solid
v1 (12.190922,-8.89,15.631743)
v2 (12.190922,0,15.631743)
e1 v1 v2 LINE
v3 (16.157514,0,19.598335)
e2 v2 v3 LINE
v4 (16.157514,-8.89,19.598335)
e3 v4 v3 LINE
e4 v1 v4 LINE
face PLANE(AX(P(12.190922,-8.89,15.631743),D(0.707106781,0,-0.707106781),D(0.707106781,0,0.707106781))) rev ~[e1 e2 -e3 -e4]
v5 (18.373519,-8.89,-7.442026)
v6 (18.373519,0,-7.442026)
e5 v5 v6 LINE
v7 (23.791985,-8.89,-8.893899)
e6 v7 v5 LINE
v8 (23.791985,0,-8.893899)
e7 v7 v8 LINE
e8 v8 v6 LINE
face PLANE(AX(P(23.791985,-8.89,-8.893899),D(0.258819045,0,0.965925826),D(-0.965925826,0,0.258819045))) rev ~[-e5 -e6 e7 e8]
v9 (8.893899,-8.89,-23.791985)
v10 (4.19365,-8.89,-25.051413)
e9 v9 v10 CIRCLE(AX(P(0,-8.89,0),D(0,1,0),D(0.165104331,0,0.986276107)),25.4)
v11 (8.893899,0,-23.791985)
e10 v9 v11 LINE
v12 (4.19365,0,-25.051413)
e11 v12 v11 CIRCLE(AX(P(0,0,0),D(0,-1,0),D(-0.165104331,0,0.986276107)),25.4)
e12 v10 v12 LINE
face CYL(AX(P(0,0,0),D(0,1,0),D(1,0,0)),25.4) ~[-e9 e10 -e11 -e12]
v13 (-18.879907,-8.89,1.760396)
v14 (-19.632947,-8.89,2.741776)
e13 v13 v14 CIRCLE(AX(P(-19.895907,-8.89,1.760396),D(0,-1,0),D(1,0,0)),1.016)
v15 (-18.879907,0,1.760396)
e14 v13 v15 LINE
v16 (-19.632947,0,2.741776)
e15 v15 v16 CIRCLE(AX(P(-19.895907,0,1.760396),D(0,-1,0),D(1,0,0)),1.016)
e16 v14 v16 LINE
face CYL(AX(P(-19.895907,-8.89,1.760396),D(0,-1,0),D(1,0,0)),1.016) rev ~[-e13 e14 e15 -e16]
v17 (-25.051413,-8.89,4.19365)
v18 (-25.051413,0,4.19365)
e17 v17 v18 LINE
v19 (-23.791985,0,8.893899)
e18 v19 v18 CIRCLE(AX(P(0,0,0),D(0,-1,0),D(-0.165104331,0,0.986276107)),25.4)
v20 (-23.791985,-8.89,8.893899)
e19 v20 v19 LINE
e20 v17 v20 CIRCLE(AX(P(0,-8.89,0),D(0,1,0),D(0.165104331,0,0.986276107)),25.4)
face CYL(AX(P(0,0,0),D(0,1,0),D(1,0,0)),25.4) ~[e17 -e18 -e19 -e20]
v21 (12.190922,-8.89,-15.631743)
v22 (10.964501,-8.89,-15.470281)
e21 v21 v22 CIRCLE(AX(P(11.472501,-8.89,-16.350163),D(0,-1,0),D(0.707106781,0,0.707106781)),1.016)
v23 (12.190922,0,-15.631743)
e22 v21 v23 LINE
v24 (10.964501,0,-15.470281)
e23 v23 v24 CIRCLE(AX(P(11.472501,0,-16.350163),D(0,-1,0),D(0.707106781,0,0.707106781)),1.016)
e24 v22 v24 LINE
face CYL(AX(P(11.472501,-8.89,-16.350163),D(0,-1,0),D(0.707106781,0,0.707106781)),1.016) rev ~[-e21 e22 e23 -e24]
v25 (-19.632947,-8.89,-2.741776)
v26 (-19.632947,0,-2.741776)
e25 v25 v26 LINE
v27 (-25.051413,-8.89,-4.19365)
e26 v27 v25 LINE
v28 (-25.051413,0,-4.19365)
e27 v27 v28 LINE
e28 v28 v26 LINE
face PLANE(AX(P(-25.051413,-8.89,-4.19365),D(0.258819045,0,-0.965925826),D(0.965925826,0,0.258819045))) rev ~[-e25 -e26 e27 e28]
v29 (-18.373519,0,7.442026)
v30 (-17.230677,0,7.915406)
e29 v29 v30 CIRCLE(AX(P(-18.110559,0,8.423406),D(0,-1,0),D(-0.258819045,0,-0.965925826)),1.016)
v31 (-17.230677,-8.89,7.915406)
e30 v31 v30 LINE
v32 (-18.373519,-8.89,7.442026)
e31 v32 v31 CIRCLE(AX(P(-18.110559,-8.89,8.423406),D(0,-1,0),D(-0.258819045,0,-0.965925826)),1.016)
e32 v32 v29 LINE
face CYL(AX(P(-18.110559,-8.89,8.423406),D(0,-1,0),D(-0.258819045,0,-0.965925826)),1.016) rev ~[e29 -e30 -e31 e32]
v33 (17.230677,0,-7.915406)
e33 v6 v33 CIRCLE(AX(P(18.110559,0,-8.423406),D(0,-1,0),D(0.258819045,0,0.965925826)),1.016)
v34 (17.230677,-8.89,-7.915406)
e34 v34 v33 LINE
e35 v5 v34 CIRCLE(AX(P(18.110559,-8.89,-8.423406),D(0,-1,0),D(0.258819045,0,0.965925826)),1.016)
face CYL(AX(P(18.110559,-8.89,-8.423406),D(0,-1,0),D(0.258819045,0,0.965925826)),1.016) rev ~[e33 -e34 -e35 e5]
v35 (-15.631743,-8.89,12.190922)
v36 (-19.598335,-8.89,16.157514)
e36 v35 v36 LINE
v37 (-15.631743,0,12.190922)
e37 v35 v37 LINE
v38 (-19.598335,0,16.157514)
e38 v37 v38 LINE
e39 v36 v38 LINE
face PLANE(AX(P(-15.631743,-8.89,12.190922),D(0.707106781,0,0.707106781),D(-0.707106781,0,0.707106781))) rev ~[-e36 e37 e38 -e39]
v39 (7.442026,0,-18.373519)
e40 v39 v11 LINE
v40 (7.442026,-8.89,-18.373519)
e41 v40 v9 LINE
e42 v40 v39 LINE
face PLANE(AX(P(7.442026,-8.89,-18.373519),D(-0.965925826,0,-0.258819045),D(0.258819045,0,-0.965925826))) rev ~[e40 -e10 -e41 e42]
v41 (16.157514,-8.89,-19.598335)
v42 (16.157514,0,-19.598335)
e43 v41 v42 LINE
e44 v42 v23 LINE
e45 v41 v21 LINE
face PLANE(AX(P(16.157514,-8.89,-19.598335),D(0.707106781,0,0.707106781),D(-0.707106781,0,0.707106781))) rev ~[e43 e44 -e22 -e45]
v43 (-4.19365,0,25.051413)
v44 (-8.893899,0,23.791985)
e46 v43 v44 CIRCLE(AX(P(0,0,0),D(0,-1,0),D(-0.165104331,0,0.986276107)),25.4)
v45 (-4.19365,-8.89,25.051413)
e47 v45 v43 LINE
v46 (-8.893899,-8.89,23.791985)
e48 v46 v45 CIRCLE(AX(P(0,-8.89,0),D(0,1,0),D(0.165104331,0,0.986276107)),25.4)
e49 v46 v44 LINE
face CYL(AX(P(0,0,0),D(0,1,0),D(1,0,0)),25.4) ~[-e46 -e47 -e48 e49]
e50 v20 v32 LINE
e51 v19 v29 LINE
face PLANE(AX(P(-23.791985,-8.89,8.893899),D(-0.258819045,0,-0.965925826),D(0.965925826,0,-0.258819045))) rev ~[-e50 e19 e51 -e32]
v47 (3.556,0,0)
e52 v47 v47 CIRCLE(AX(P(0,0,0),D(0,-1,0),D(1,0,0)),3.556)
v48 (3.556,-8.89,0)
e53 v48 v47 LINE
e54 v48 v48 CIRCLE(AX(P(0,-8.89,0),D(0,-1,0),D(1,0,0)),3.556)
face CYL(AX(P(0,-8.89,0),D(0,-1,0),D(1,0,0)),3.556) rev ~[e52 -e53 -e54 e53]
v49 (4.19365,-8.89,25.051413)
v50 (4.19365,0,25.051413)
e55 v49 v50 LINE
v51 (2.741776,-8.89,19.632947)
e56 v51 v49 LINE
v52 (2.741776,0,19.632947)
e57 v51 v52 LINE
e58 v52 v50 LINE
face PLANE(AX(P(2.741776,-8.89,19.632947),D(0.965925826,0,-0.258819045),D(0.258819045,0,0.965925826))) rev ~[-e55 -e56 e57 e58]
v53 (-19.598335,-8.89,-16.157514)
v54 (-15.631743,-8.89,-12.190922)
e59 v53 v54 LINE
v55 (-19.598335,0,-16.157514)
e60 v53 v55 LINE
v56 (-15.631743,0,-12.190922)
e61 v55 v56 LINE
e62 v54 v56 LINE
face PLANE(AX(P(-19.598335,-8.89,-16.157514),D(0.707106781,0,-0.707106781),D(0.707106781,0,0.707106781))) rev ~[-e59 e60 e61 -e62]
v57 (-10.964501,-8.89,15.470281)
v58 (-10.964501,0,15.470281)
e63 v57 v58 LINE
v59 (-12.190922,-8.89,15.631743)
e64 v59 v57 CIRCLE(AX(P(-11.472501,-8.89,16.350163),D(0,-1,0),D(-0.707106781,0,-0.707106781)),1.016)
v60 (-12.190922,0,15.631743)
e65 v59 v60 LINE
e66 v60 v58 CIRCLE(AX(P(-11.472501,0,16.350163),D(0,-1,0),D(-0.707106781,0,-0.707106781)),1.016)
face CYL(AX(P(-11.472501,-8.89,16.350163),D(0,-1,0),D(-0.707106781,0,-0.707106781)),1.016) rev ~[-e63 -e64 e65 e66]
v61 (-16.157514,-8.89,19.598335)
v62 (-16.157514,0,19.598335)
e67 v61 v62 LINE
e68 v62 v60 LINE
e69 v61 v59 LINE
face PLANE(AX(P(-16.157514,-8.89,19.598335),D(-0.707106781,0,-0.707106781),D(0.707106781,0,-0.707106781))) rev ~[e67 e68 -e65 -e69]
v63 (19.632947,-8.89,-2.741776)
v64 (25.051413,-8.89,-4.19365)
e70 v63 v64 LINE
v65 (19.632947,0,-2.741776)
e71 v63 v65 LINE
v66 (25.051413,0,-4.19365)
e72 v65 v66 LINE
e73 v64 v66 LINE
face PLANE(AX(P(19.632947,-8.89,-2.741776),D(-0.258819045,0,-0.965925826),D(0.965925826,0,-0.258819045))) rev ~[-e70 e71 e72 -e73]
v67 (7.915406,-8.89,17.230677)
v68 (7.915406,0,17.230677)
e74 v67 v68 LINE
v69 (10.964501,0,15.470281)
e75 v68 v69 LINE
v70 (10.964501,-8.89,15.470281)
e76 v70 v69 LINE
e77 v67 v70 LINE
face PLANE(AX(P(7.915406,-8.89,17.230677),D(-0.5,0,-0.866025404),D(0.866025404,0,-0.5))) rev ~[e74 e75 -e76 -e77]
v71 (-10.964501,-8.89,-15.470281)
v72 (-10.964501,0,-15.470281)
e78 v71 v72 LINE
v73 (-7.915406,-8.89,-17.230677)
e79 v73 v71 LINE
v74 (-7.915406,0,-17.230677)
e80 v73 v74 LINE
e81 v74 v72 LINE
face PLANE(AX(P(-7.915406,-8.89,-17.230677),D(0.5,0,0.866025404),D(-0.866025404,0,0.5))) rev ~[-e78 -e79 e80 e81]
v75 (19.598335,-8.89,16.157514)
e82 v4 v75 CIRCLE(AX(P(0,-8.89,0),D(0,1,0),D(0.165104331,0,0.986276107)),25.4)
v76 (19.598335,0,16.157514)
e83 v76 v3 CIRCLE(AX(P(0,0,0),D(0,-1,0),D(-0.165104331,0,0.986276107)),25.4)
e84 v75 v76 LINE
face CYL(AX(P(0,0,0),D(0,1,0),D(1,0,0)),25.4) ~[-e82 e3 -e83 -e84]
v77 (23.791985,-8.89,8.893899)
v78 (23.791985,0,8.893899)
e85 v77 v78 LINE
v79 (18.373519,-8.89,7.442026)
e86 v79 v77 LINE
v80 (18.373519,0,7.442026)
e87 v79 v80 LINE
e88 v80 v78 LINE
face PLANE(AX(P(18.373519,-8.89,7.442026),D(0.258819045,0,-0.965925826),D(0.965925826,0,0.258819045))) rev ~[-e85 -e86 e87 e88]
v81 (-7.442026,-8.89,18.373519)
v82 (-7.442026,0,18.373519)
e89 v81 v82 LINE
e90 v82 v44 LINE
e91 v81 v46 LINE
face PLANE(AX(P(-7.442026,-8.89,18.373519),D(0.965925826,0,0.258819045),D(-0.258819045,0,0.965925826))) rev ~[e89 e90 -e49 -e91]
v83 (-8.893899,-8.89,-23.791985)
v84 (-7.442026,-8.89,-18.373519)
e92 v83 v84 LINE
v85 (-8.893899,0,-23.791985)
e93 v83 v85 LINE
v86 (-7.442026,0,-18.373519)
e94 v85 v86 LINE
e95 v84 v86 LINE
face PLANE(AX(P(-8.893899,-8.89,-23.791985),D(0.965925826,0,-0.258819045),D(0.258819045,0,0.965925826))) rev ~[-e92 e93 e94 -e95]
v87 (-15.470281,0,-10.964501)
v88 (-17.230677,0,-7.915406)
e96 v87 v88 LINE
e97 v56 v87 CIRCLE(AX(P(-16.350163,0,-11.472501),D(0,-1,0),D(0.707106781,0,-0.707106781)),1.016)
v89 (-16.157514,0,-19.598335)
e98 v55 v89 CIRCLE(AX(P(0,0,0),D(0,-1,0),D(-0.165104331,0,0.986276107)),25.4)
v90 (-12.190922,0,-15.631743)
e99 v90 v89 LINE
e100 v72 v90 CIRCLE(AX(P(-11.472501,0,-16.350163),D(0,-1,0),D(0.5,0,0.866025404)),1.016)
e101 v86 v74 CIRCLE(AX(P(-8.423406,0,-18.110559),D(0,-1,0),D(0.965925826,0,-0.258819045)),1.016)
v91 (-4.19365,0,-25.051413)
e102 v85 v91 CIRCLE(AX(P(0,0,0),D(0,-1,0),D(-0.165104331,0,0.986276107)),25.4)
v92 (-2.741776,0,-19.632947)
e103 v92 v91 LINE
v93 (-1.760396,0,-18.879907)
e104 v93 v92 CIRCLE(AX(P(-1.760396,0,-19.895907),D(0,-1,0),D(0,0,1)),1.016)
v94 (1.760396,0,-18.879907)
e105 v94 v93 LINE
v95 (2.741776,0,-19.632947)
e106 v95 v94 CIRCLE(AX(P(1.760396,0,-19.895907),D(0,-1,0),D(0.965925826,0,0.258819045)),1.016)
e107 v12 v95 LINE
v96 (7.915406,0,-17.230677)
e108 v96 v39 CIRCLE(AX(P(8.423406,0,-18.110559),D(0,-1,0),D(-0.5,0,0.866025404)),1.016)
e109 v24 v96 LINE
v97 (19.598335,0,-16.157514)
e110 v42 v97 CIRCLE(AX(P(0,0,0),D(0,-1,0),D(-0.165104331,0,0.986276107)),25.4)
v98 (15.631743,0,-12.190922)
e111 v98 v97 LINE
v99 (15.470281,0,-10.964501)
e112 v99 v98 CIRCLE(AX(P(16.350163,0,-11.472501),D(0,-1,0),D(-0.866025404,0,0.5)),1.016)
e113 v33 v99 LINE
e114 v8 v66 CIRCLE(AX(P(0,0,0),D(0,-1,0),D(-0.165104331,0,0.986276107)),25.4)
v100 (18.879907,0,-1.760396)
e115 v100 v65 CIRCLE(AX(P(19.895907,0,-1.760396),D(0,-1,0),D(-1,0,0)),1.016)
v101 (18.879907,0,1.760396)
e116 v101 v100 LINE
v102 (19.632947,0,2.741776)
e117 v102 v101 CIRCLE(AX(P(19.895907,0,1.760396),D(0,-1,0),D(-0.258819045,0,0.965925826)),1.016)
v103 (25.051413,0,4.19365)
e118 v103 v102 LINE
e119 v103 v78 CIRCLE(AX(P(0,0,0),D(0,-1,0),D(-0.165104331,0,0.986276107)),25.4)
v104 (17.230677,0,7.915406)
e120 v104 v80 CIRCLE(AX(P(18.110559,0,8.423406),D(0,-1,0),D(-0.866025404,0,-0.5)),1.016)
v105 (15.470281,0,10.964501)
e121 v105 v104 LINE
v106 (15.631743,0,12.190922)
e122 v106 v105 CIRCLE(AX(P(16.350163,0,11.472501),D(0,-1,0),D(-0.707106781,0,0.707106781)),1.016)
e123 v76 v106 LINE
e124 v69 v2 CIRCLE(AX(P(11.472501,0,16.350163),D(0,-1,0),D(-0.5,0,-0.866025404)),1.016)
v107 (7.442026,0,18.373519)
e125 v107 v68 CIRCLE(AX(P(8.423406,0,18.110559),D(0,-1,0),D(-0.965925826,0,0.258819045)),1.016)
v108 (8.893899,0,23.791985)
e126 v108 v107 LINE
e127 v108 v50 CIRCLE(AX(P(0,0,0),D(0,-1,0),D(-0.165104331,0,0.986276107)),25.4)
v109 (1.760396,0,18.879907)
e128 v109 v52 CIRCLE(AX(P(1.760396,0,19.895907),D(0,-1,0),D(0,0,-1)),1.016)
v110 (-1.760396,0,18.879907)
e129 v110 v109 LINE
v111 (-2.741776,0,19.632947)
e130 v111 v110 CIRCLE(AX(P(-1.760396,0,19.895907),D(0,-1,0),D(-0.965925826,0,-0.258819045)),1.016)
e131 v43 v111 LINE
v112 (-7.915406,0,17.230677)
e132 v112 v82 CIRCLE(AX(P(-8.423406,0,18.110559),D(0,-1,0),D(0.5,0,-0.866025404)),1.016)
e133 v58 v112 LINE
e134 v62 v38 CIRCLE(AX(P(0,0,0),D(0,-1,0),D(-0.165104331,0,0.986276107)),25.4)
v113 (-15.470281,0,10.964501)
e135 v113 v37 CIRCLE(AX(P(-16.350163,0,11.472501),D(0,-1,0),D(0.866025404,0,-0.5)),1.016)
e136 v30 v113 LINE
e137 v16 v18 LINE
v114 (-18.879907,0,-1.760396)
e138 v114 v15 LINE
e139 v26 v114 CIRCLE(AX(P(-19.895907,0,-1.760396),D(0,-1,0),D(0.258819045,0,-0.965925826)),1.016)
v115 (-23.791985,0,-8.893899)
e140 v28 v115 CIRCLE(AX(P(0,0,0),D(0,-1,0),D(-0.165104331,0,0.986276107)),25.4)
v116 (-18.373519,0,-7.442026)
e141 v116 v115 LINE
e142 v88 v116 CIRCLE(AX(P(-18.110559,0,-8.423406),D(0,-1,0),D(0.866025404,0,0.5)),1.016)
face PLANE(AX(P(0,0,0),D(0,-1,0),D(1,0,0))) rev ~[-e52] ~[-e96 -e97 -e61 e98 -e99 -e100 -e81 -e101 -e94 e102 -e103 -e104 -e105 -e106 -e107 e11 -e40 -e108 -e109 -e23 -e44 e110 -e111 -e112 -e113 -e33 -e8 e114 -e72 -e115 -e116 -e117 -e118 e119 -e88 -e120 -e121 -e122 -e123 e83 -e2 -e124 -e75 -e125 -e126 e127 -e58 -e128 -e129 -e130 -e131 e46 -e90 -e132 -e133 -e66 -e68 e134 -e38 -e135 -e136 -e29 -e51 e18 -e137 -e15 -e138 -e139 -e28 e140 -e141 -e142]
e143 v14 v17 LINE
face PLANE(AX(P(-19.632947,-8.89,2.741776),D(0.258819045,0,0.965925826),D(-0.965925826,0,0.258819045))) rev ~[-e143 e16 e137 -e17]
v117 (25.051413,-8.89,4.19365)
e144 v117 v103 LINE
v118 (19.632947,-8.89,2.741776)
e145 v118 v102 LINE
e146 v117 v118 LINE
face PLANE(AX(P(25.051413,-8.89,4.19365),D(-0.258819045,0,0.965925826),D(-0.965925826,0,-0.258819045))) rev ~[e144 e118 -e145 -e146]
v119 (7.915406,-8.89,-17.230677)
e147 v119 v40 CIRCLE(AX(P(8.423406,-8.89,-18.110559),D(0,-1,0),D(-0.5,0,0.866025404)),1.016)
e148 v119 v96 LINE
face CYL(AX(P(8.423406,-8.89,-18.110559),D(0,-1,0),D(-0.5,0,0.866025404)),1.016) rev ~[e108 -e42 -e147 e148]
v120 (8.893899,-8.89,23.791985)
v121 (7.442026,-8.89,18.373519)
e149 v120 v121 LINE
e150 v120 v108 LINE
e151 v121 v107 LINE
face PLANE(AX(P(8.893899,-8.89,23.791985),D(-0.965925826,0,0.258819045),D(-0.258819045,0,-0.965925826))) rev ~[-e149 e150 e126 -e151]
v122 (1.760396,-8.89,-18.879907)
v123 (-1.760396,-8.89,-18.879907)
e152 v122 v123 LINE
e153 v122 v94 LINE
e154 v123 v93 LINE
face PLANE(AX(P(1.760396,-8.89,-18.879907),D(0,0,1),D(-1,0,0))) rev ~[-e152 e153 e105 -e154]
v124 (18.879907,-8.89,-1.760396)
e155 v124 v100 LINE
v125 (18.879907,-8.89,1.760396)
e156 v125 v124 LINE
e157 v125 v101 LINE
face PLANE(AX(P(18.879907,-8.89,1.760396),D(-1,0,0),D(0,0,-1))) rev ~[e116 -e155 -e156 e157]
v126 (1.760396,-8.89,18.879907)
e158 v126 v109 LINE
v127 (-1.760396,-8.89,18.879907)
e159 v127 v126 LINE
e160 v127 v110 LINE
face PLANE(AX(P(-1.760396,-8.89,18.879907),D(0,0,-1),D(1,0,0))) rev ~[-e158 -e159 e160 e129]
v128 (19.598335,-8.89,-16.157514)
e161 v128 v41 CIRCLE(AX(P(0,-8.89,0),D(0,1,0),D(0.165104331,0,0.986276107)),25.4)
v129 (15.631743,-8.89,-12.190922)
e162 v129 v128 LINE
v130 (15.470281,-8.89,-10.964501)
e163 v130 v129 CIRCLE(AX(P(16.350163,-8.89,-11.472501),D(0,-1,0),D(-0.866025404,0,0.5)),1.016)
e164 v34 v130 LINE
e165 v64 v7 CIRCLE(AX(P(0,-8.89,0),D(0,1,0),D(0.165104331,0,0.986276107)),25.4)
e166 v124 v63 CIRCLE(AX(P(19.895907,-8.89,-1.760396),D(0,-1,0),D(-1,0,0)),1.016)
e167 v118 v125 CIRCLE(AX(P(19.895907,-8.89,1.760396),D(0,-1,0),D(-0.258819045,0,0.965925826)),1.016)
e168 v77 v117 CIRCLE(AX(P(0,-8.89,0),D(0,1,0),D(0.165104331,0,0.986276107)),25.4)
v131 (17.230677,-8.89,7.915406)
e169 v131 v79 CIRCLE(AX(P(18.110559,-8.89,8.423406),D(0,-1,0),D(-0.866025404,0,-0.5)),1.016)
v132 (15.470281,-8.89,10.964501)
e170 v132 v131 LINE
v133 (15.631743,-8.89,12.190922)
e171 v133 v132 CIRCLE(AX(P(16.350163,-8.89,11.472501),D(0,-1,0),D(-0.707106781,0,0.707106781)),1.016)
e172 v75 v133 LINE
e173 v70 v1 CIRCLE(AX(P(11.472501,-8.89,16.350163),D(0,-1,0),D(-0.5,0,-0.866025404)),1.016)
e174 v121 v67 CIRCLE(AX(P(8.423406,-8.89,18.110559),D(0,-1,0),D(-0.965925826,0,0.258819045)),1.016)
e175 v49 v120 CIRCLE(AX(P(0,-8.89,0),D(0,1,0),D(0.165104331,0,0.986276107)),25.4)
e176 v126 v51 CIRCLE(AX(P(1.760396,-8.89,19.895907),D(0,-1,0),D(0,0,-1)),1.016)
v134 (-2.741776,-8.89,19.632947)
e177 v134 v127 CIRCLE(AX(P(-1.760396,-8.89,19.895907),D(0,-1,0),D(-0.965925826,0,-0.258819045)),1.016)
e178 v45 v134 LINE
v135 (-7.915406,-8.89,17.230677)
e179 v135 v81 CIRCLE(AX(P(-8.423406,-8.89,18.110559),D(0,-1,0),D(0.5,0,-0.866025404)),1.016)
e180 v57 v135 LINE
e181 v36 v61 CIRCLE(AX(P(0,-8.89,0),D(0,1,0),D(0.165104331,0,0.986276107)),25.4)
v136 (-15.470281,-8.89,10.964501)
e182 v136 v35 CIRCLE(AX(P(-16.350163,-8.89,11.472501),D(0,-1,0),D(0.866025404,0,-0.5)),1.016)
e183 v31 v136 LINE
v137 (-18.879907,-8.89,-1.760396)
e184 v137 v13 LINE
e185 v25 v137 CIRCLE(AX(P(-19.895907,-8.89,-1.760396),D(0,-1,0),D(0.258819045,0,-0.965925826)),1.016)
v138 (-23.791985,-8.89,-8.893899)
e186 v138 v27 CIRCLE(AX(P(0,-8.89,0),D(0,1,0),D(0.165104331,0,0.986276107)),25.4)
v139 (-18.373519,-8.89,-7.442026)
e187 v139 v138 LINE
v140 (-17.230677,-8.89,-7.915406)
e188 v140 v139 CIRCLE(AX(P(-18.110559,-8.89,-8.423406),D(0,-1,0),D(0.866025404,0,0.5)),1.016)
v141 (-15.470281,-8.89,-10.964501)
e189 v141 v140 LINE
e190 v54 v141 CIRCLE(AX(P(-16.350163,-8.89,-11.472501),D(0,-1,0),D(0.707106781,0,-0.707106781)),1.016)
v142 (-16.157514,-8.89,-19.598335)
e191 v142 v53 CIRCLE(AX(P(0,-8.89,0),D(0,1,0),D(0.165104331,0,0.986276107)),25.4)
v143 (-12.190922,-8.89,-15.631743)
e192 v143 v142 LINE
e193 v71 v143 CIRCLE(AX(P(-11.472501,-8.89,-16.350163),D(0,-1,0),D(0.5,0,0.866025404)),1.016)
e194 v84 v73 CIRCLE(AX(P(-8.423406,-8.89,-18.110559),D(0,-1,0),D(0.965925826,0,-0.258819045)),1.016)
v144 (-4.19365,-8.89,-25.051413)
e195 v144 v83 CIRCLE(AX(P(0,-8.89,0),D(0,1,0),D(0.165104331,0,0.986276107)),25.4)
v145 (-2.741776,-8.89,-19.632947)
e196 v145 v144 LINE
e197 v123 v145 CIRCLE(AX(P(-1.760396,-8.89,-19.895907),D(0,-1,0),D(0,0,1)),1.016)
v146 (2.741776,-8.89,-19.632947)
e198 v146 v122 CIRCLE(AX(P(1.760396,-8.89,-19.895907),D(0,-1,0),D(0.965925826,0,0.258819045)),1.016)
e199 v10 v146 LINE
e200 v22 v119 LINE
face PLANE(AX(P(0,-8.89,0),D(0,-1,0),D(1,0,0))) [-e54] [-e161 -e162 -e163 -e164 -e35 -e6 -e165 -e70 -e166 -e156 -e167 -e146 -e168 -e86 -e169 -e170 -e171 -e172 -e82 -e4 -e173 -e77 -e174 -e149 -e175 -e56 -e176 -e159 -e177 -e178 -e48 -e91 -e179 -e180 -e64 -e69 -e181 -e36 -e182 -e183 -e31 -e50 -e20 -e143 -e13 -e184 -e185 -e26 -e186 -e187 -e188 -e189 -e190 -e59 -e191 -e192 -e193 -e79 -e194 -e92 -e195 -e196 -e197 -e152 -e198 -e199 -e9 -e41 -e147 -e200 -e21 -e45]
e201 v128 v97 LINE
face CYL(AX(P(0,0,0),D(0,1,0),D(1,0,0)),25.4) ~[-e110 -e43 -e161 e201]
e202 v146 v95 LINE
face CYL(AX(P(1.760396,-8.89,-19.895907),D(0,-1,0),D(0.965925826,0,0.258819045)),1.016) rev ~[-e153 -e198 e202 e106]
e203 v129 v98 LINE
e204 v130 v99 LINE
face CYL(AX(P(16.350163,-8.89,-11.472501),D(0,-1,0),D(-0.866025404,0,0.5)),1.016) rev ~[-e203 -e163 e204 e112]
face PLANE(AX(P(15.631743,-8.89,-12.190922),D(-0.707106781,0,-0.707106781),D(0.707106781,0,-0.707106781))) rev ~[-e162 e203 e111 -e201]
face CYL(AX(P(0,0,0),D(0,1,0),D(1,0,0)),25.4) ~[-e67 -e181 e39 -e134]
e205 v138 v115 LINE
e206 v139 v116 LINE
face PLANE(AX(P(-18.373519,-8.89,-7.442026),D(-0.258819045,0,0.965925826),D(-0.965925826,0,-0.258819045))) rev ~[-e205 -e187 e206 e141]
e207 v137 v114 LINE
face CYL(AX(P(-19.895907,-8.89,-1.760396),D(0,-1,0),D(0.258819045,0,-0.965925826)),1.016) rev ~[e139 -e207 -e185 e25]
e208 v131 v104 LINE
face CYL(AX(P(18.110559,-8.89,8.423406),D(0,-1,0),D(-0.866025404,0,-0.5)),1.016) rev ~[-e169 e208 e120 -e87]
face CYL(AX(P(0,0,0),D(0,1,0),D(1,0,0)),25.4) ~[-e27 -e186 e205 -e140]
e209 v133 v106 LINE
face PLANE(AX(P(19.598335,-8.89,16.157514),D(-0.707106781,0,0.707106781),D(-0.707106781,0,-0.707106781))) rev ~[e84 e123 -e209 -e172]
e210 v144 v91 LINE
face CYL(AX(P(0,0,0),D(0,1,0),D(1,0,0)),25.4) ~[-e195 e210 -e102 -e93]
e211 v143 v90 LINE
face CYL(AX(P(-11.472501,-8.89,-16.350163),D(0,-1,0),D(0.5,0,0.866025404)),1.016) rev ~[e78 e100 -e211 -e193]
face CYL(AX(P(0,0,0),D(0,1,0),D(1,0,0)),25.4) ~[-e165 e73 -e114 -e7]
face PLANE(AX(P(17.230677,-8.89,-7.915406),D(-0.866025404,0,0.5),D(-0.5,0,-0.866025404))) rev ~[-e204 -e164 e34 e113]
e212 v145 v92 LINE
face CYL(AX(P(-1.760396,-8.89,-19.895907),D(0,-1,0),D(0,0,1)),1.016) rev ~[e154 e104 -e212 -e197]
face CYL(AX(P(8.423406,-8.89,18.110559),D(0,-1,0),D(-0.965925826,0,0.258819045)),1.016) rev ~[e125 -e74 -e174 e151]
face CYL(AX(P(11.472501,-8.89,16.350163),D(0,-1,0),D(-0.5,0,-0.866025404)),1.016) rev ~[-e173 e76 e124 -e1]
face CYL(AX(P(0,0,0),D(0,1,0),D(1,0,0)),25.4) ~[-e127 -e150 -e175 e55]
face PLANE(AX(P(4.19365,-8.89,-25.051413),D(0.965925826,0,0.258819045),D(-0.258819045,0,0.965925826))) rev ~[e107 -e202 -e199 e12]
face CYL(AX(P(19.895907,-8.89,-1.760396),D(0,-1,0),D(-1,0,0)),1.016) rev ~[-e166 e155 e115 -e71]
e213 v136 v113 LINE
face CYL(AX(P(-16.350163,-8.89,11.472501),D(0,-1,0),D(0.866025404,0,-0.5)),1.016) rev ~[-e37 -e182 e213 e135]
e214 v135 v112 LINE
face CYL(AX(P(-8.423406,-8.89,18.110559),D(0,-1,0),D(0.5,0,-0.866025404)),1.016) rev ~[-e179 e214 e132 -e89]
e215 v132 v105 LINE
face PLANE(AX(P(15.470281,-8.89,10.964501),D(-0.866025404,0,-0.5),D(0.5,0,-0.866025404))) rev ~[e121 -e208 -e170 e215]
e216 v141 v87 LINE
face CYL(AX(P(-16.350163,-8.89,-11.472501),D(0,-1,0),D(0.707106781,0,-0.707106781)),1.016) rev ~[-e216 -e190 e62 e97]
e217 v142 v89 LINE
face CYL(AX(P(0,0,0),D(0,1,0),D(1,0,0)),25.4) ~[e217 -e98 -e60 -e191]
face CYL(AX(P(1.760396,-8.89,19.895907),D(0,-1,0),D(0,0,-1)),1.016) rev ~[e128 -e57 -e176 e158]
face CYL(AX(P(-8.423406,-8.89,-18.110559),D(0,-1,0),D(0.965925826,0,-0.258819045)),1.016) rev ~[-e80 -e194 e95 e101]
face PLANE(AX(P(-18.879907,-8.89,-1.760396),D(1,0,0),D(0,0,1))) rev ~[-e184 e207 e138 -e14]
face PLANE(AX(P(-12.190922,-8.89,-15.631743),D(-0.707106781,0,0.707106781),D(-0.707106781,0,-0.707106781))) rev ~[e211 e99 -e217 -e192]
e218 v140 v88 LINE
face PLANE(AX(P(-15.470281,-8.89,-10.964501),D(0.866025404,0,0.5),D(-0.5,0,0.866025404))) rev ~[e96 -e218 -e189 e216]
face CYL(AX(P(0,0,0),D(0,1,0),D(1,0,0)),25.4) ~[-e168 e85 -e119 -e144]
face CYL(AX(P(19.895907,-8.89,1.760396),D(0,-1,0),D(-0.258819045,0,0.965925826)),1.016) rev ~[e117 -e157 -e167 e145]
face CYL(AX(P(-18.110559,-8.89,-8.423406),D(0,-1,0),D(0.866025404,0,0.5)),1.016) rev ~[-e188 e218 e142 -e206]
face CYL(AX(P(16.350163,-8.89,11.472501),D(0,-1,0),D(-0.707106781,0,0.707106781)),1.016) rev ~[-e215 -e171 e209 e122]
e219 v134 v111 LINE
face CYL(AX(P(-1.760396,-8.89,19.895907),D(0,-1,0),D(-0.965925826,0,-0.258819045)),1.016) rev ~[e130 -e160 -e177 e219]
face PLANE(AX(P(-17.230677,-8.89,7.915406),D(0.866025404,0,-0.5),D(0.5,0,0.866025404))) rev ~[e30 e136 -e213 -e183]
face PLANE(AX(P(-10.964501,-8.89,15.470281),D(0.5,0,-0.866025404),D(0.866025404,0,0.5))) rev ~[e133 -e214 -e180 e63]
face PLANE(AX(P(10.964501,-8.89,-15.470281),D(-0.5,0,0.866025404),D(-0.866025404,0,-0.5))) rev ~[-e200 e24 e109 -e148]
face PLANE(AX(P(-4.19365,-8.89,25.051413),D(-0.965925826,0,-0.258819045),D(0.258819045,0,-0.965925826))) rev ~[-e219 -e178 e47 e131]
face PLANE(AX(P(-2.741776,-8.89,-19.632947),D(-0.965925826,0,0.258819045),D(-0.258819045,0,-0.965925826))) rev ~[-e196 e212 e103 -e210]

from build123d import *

# Parameters (mm, degrees)
F0_R     = 25.4
F1_DEPTH = 8.89
F3_DEPTH = 25.4
F4_COUNT = 12
F4_ANGLE = 330
F5_R     = 3.556
F6_DEPTH = 25.4


with BuildPart() as f1:
    # F0 (on Front) → F1 (new body)
    with BuildSketch(Plane.XZ):
        Circle(F0_R)
    extrude(amount=F1_DEPTH)

    # F2 (on face) → F3 (cut)
    with BuildSketch(Plane.XZ.offset(8.89)):
        with BuildLine():
            ThreePointArc((1.7603957802, 18.8799073091), (2.3788973921, 19.0898603154), (2.7417764197, 19.6329471593))
            Line((2.7417764197, 19.6329471593), (4.19365, 25.0514131273))
            ThreePointArc((4.19365, 25.0514131274), (0, 25.4), (-4.19365, 25.0514131274))
            Line((-4.19365, 25.0514131273), (-2.7417764197, 19.6329471593))
            ThreePointArc((-2.7417764197, 19.6329471593), (-2.3788973921, 19.0898603154), (-1.7603957802, 18.8799073091))
            Line((-1.7603957802, 18.8799073091), (0, 18.8799073091))
            Line((0, 18.8799073091), (1.7603957802, 18.8799073091))
        make_face()
    f3 = extrude(amount=-F3_DEPTH, mode=Mode.SUBTRACT)

    # F4: F3 ×12 about axis
    f4_axis = Axis((0, 0, 0), (0, 1, 0))
    for i in range(1, F4_COUNT):
        add(f3.rotate(f4_axis, i * F4_ANGLE / (F4_COUNT - 1)), mode=Mode.SUBTRACT)

    # F5 (on face) → F6 (cut)
    with BuildSketch(Plane.XZ.offset(8.89)):
        Circle(F5_R)
    extrude(amount=-F6_DEPTH, mode=Mode.SUBTRACT)


solid = f1.part
